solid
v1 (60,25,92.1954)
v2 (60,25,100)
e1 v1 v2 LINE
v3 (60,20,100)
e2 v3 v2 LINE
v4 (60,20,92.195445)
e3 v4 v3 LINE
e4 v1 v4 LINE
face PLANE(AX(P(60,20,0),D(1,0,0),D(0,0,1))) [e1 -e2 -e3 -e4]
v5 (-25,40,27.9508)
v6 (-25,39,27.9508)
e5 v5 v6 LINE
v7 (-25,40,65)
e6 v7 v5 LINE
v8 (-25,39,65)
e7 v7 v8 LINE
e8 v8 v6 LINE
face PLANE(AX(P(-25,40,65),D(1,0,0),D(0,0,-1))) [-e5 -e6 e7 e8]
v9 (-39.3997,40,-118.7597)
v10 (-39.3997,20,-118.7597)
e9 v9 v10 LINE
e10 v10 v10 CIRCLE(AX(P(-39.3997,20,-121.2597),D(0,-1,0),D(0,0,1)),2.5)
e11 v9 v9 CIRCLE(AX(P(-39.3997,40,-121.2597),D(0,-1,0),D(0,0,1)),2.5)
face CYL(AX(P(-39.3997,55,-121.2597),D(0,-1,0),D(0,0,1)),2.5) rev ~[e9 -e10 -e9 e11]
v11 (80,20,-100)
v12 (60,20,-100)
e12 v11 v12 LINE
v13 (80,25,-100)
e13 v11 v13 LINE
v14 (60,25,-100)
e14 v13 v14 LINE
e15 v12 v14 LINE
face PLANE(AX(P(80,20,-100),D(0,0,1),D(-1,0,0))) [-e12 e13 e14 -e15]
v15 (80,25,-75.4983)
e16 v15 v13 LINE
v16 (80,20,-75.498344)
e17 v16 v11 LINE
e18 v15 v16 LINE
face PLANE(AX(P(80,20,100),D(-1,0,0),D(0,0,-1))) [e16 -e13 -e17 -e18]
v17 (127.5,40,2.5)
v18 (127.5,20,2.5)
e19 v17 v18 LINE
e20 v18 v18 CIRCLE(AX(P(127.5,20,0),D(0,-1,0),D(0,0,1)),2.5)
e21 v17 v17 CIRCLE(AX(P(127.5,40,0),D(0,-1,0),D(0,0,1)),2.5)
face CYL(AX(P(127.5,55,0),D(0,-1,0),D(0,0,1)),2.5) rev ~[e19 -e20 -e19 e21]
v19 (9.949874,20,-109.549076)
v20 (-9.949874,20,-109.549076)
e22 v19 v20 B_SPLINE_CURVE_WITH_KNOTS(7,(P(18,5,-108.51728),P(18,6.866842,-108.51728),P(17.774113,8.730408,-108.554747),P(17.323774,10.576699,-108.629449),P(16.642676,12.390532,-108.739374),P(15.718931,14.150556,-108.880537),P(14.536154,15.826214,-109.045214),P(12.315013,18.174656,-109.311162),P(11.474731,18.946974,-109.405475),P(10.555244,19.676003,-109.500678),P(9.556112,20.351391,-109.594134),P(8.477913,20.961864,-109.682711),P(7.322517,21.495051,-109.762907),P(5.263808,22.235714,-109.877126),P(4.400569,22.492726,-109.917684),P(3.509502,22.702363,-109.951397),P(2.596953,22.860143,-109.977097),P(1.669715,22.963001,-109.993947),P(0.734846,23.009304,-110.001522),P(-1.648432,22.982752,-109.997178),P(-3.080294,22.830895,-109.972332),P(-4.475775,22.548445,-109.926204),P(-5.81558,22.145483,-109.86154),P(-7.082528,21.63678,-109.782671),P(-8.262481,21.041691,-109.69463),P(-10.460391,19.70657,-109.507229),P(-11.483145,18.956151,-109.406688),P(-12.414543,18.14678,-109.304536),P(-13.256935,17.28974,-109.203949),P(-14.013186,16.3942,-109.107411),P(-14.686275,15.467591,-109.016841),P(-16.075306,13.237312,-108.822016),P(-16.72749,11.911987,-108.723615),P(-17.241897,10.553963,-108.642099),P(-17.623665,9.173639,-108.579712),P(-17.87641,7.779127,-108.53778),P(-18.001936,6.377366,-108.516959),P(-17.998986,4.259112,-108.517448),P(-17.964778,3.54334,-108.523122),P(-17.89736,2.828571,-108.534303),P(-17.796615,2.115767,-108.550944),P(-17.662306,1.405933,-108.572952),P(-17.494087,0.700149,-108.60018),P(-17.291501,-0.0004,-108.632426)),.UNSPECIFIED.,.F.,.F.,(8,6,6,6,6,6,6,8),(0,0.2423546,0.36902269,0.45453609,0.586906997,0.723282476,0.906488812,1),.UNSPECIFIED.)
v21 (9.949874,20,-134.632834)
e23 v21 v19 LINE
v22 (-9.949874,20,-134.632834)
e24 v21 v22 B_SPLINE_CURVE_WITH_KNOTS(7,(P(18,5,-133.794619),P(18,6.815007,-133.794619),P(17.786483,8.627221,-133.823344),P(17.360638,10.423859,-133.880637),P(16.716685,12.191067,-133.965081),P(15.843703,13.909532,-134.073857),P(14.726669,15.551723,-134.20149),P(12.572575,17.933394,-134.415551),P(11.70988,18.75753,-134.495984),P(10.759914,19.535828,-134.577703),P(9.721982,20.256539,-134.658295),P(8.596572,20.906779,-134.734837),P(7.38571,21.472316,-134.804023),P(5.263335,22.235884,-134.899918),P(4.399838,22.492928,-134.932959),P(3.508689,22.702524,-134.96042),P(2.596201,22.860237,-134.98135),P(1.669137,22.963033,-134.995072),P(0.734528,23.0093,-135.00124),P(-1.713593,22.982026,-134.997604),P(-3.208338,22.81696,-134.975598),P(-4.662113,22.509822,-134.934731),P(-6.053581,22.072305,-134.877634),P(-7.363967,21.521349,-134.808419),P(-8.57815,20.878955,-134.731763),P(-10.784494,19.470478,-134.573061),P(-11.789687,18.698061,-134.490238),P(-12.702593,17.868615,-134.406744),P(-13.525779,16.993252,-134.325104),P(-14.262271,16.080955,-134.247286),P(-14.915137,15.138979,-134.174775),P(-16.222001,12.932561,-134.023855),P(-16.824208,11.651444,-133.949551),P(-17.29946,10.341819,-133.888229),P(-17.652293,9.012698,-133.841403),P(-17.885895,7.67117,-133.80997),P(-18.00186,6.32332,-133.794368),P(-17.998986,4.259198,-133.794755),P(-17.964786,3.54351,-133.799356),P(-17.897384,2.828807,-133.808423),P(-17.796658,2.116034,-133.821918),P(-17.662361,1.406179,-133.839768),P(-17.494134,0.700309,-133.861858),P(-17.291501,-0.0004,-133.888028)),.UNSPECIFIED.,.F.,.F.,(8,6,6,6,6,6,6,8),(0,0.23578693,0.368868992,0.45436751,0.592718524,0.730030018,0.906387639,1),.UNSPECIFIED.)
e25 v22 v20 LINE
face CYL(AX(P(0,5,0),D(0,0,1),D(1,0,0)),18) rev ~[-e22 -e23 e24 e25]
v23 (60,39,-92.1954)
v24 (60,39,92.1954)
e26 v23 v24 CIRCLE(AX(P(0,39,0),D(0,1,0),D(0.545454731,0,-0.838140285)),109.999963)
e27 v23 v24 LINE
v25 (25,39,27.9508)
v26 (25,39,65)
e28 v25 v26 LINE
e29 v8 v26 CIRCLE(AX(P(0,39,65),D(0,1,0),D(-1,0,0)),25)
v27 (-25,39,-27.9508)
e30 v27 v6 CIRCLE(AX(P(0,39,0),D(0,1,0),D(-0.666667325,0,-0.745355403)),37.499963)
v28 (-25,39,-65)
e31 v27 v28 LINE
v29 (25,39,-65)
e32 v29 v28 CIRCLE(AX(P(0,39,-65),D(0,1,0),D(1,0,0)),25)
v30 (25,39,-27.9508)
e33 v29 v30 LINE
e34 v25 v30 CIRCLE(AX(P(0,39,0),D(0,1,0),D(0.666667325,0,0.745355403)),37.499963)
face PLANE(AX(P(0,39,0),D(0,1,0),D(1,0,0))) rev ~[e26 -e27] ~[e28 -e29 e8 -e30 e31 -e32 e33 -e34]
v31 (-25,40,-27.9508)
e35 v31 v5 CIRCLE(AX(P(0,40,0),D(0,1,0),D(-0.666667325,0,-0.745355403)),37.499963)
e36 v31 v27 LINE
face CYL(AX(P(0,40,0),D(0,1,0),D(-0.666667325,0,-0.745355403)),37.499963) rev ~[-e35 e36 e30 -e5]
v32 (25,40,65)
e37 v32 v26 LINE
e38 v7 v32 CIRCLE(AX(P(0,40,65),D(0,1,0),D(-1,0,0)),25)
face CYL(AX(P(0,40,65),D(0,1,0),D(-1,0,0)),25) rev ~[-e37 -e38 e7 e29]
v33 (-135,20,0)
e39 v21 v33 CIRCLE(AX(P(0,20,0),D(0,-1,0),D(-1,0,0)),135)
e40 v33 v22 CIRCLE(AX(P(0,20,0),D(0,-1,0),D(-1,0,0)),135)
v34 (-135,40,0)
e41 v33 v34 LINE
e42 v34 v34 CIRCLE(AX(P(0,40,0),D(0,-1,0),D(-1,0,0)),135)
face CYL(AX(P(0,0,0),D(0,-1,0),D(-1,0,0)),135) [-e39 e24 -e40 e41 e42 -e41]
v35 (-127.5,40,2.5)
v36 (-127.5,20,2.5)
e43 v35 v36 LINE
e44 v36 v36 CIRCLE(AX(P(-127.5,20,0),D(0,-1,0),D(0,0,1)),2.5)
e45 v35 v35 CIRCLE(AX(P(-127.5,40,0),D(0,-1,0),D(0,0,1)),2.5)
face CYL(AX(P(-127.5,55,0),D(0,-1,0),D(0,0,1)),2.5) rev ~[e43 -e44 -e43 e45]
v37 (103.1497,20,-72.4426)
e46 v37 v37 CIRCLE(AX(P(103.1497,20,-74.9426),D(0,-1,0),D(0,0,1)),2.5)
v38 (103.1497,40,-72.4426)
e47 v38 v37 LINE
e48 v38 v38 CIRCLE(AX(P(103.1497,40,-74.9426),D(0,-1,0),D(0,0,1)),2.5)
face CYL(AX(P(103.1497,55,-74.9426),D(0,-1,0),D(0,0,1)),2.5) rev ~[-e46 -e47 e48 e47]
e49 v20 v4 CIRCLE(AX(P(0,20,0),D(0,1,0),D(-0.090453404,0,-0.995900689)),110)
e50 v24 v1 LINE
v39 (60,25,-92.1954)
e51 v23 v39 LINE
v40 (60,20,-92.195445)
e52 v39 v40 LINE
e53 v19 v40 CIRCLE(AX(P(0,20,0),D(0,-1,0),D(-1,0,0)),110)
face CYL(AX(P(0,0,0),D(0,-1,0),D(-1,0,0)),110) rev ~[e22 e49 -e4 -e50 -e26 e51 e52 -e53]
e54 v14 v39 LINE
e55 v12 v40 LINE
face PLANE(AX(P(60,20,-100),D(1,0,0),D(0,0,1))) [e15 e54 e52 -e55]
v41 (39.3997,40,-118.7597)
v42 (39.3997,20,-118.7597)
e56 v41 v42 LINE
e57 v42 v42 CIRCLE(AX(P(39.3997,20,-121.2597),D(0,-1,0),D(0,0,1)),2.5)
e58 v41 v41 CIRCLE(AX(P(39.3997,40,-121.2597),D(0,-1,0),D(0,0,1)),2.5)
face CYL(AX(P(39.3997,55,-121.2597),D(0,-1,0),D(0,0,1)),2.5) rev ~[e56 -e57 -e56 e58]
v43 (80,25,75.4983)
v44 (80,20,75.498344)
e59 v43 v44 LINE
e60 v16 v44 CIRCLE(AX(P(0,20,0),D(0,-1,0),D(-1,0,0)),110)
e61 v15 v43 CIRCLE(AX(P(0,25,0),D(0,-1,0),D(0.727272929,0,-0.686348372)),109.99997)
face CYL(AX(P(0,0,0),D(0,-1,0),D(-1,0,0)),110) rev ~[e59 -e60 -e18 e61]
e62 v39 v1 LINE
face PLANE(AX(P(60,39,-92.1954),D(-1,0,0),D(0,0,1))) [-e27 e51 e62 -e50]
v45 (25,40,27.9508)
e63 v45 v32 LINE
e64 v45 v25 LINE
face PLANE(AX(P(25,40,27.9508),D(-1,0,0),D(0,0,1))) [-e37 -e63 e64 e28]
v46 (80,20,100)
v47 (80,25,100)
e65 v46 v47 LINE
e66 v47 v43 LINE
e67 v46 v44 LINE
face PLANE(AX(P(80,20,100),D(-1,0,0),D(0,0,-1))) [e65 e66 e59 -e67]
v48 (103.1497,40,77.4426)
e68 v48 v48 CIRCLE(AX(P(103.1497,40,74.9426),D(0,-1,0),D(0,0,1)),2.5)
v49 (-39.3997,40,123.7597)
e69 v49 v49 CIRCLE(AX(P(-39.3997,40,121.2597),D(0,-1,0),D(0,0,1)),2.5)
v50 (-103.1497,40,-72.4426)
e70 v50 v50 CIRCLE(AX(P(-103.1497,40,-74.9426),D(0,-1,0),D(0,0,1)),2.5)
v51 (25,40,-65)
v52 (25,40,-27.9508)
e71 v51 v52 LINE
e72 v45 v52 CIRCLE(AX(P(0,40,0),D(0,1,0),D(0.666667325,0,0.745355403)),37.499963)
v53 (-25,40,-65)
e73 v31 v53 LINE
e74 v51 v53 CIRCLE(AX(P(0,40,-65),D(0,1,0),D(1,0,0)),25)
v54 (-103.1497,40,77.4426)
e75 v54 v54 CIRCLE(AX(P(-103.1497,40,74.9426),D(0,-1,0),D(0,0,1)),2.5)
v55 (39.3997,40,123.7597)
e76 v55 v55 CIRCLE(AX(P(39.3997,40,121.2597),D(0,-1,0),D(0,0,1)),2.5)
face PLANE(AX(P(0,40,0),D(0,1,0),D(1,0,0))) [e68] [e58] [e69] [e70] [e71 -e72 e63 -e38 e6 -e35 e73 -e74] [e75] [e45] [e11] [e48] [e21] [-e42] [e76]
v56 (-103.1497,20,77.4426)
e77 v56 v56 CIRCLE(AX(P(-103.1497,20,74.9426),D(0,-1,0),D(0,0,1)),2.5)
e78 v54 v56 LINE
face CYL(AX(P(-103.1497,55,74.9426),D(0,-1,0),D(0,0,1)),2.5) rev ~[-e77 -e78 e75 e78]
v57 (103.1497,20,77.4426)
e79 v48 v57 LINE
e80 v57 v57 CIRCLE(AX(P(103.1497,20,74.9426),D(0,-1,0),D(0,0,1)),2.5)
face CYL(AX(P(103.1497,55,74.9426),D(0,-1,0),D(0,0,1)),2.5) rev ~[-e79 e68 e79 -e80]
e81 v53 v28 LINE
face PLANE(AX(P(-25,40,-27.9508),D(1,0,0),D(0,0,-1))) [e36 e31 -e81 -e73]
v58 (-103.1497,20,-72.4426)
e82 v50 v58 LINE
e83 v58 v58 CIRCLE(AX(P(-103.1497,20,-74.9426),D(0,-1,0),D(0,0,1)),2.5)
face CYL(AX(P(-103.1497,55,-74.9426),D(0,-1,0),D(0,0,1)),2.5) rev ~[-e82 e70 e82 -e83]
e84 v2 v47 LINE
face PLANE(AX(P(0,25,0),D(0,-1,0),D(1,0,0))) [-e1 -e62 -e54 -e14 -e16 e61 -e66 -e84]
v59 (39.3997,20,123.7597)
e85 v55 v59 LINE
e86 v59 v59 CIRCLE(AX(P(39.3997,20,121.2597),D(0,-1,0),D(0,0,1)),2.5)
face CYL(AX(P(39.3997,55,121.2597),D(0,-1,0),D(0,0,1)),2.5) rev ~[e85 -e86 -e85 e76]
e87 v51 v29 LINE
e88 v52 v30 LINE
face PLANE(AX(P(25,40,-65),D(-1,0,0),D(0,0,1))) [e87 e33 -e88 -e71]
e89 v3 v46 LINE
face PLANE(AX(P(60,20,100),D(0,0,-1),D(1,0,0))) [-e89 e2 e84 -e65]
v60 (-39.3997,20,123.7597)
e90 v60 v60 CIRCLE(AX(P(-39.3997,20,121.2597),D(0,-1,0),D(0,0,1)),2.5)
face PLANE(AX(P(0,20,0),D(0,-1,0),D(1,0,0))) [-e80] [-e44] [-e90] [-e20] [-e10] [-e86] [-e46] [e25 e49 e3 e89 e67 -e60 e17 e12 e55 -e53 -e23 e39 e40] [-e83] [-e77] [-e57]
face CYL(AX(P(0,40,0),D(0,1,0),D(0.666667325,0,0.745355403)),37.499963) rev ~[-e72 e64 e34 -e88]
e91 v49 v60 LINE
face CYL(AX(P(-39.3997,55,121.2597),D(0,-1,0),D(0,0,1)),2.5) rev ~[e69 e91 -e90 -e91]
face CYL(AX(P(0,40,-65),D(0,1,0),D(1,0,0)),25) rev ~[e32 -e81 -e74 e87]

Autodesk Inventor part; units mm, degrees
ref_plane "YZ Plane" through (0, 0, 0) normal (1, 0, 0) x (0, 1, 0)
ref_plane "XZ Plane" through (0, 0, 0) normal (0, 1, 0) x (-1, 0, 0)
ref_plane "XY Plane" through (0, 0, 0) normal (0, 0, 1) x (1, 0, 0)
sketch "Sketch1" plane through (0, 0, 0) normal (0, 1, 0) x (-1, 0, 0)
  circle A0 centre (0, 0) radius 135
  circle A1 centre (0, 0) radius 110
  dimension "d0" = 270
  dimension "d1" = 220
extrude "Extrusion1" add sketch "Sketch1" along normal blind 55
sketch "Sketch2" plane through (0, 0, 0) normal (0, 0, 1) x (1, 0, 0)
  circle A0 centre (0, 5) radius 18
  line L0 (135, 0) -> (-135, 0) projected
  point P0 (0, 0)
  dimension "d4" = 36
  dimension "d5" = 5
extrude "Extrusion2" cut sketch "Sketch2" against normal through all
sketch "Sketch3" plane through (0, 0, 0) normal (0, -1, 0) x (1, 0, 0)
  circle A0 centre (0, 0) radius 140
extrude "Extrusion3" cut sketch "Sketch3" against normal blind 20
sketch "Sketch4" plane through (0, 20, 0) normal (0, -1, 0) x (1, 0, 0)
  line L0 (0, 0) -> (70, 0)
  line L1 (80, -100) -> (60, -100)
  line L2 (60, -100) -> (60, 100)
  line L3 (60, 100) -> (80, 100)
  line L4 (80, 100) -> (80, -100)
  line L5 (80, -100) -> (60, 100) construction
  line L6 (60, -100) -> (80, 100) construction
  dimension "d10" = 70
  dimension "d11" = 20
  dimension "d12" = 200
extrude "Extrusion4" cut sketch "Sketch4" against normal through all
sketch "Sketch5" plane through (0, 55, 0) normal (0, 1, 0) x (1, 0, 0)
  circle A0 centre (0, 0) radius 127.5
  circle A1 centre (127.5, 0) radius 2
  circle A2 centre (103.1497, 74.9426) radius 2
  circle A3 centre (39.3997, 121.2597) radius 2
  circle A4 centre (-39.3997, 121.2597) radius 2
  circle A5 centre (-103.1497, 74.9426) radius 2
  circle A6 centre (-127.5, 0) radius 2
  circle A7 centre (-103.1497, -74.9426) radius 2
  circle A8 centre (-39.3997, -121.2597) radius 2
  circle A9 centre (39.3997, -121.2597) radius 2
  circle A10 centre (103.1497, -74.9426) radius 2
  dimension "d15" = 255
  dimension "d16" = 4
  dimension "d19" = 360
hole "Hole1" at (127.5, 55, 0) at (103.1497, 55, 74.9426) at (39.3997, 55, 121.2597) at (-39.3997, 55, 121.2597) at (-103.1497, 55, 74.9426) at (-127.5, 55, 0) at (-103.1497, 55, -74.9426) at (-39.3997, 55, -121.2597) at (39.3997, 55, -121.2597) at (103.1497, 55, -74.9426) direction (0, -1, 0) diameter 5 end through all
sketch "Sketch6" plane through (0, 55, 0) normal (0, 1, 0) x (1, 0, 0)
  circle A0 centre (0, 0) radius 140
extrude "Extrusion5" cut sketch "Sketch6" against normal blind 15
sketch "Sketch7" plane through (0, 40, 0) normal (0, 1, 0) x (1, 0, 0)
  circle A0 centre (0, 0) radius 140
  line L0 (80, -100) -> (80, -75.4983) projected
  line L1 (80, -100) -> (80, -75.4983)
  line L2 (60, -100) -> (80, -100) projected
  line L3 (80, -100) -> (60, -100)
  line L4 (60, -100) -> (60, -92.1954)
  line L5 (60, 100) -> (60, 92.1954) projected
  line L6 (60, 92.1954) -> (60, 100)
  line L7 (60, 100) -> (80, 100)
  line L8 (80, 100) -> (80, 75.4983)
  arc A1 (80, -75.4983) -> (80, 75.4983) centre (0, 0) ccw
  arc A2 (60, 92.1954) -> (60, -92.1954) centre (0, 0) ccw
  arc A3 (-25, -65) -> (25, -65) centre (0, -65) ccw
  arc A4 (25, 65) -> (-25, 65) centre (0, 65) ccw
  arc A5 (25, -27.9508) -> (25, 27.9508) centre (0, 0) ccw
  arc A6 (-25, 27.9508) -> (-25, -27.9508) centre (0, 0) ccw
  line L9 (25, 65) -> (25, 27.9508)
  line L10 (25, -27.9508) -> (25, -65)
  line L11 (-25, -65) -> (-25, -27.9508)
  line L12 (-25, 27.9508) -> (-25, 65)
extrude "Extrusion6" add sketch "Sketch7" against normal blind 1 contours L2 L4 A2 L5 L7 L8 A1 L0
sketch "Sketch8" plane through (0, 39, 0) normal (0, -1, 0) x (1, 0, 0)
  line L0 (80, -75.4983) -> (80, -100) projected
  line L1 (80, -100) -> (60, -100)
  line L2 (60, -100) -> (60, 100)
  line L3 (60, 100) -> (80, 100)
  line L4 (80, 100) -> (80, 75.4983)
  line L5 (80, -75.4983) -> (80, -100)
  arc A0 (80, -75.4983) -> (80, 75.4983) centre (0, 0) ccw
  arc A1 (60, 92.1954) -> (60, -92.1954) centre (0, 0) ccw
extrude "Extrusion7" add sketch "Sketch8" along normal blind 14 contours L0 L1 L2 L3 L4 A0
properties part number "Cylinder Spacer Top"
